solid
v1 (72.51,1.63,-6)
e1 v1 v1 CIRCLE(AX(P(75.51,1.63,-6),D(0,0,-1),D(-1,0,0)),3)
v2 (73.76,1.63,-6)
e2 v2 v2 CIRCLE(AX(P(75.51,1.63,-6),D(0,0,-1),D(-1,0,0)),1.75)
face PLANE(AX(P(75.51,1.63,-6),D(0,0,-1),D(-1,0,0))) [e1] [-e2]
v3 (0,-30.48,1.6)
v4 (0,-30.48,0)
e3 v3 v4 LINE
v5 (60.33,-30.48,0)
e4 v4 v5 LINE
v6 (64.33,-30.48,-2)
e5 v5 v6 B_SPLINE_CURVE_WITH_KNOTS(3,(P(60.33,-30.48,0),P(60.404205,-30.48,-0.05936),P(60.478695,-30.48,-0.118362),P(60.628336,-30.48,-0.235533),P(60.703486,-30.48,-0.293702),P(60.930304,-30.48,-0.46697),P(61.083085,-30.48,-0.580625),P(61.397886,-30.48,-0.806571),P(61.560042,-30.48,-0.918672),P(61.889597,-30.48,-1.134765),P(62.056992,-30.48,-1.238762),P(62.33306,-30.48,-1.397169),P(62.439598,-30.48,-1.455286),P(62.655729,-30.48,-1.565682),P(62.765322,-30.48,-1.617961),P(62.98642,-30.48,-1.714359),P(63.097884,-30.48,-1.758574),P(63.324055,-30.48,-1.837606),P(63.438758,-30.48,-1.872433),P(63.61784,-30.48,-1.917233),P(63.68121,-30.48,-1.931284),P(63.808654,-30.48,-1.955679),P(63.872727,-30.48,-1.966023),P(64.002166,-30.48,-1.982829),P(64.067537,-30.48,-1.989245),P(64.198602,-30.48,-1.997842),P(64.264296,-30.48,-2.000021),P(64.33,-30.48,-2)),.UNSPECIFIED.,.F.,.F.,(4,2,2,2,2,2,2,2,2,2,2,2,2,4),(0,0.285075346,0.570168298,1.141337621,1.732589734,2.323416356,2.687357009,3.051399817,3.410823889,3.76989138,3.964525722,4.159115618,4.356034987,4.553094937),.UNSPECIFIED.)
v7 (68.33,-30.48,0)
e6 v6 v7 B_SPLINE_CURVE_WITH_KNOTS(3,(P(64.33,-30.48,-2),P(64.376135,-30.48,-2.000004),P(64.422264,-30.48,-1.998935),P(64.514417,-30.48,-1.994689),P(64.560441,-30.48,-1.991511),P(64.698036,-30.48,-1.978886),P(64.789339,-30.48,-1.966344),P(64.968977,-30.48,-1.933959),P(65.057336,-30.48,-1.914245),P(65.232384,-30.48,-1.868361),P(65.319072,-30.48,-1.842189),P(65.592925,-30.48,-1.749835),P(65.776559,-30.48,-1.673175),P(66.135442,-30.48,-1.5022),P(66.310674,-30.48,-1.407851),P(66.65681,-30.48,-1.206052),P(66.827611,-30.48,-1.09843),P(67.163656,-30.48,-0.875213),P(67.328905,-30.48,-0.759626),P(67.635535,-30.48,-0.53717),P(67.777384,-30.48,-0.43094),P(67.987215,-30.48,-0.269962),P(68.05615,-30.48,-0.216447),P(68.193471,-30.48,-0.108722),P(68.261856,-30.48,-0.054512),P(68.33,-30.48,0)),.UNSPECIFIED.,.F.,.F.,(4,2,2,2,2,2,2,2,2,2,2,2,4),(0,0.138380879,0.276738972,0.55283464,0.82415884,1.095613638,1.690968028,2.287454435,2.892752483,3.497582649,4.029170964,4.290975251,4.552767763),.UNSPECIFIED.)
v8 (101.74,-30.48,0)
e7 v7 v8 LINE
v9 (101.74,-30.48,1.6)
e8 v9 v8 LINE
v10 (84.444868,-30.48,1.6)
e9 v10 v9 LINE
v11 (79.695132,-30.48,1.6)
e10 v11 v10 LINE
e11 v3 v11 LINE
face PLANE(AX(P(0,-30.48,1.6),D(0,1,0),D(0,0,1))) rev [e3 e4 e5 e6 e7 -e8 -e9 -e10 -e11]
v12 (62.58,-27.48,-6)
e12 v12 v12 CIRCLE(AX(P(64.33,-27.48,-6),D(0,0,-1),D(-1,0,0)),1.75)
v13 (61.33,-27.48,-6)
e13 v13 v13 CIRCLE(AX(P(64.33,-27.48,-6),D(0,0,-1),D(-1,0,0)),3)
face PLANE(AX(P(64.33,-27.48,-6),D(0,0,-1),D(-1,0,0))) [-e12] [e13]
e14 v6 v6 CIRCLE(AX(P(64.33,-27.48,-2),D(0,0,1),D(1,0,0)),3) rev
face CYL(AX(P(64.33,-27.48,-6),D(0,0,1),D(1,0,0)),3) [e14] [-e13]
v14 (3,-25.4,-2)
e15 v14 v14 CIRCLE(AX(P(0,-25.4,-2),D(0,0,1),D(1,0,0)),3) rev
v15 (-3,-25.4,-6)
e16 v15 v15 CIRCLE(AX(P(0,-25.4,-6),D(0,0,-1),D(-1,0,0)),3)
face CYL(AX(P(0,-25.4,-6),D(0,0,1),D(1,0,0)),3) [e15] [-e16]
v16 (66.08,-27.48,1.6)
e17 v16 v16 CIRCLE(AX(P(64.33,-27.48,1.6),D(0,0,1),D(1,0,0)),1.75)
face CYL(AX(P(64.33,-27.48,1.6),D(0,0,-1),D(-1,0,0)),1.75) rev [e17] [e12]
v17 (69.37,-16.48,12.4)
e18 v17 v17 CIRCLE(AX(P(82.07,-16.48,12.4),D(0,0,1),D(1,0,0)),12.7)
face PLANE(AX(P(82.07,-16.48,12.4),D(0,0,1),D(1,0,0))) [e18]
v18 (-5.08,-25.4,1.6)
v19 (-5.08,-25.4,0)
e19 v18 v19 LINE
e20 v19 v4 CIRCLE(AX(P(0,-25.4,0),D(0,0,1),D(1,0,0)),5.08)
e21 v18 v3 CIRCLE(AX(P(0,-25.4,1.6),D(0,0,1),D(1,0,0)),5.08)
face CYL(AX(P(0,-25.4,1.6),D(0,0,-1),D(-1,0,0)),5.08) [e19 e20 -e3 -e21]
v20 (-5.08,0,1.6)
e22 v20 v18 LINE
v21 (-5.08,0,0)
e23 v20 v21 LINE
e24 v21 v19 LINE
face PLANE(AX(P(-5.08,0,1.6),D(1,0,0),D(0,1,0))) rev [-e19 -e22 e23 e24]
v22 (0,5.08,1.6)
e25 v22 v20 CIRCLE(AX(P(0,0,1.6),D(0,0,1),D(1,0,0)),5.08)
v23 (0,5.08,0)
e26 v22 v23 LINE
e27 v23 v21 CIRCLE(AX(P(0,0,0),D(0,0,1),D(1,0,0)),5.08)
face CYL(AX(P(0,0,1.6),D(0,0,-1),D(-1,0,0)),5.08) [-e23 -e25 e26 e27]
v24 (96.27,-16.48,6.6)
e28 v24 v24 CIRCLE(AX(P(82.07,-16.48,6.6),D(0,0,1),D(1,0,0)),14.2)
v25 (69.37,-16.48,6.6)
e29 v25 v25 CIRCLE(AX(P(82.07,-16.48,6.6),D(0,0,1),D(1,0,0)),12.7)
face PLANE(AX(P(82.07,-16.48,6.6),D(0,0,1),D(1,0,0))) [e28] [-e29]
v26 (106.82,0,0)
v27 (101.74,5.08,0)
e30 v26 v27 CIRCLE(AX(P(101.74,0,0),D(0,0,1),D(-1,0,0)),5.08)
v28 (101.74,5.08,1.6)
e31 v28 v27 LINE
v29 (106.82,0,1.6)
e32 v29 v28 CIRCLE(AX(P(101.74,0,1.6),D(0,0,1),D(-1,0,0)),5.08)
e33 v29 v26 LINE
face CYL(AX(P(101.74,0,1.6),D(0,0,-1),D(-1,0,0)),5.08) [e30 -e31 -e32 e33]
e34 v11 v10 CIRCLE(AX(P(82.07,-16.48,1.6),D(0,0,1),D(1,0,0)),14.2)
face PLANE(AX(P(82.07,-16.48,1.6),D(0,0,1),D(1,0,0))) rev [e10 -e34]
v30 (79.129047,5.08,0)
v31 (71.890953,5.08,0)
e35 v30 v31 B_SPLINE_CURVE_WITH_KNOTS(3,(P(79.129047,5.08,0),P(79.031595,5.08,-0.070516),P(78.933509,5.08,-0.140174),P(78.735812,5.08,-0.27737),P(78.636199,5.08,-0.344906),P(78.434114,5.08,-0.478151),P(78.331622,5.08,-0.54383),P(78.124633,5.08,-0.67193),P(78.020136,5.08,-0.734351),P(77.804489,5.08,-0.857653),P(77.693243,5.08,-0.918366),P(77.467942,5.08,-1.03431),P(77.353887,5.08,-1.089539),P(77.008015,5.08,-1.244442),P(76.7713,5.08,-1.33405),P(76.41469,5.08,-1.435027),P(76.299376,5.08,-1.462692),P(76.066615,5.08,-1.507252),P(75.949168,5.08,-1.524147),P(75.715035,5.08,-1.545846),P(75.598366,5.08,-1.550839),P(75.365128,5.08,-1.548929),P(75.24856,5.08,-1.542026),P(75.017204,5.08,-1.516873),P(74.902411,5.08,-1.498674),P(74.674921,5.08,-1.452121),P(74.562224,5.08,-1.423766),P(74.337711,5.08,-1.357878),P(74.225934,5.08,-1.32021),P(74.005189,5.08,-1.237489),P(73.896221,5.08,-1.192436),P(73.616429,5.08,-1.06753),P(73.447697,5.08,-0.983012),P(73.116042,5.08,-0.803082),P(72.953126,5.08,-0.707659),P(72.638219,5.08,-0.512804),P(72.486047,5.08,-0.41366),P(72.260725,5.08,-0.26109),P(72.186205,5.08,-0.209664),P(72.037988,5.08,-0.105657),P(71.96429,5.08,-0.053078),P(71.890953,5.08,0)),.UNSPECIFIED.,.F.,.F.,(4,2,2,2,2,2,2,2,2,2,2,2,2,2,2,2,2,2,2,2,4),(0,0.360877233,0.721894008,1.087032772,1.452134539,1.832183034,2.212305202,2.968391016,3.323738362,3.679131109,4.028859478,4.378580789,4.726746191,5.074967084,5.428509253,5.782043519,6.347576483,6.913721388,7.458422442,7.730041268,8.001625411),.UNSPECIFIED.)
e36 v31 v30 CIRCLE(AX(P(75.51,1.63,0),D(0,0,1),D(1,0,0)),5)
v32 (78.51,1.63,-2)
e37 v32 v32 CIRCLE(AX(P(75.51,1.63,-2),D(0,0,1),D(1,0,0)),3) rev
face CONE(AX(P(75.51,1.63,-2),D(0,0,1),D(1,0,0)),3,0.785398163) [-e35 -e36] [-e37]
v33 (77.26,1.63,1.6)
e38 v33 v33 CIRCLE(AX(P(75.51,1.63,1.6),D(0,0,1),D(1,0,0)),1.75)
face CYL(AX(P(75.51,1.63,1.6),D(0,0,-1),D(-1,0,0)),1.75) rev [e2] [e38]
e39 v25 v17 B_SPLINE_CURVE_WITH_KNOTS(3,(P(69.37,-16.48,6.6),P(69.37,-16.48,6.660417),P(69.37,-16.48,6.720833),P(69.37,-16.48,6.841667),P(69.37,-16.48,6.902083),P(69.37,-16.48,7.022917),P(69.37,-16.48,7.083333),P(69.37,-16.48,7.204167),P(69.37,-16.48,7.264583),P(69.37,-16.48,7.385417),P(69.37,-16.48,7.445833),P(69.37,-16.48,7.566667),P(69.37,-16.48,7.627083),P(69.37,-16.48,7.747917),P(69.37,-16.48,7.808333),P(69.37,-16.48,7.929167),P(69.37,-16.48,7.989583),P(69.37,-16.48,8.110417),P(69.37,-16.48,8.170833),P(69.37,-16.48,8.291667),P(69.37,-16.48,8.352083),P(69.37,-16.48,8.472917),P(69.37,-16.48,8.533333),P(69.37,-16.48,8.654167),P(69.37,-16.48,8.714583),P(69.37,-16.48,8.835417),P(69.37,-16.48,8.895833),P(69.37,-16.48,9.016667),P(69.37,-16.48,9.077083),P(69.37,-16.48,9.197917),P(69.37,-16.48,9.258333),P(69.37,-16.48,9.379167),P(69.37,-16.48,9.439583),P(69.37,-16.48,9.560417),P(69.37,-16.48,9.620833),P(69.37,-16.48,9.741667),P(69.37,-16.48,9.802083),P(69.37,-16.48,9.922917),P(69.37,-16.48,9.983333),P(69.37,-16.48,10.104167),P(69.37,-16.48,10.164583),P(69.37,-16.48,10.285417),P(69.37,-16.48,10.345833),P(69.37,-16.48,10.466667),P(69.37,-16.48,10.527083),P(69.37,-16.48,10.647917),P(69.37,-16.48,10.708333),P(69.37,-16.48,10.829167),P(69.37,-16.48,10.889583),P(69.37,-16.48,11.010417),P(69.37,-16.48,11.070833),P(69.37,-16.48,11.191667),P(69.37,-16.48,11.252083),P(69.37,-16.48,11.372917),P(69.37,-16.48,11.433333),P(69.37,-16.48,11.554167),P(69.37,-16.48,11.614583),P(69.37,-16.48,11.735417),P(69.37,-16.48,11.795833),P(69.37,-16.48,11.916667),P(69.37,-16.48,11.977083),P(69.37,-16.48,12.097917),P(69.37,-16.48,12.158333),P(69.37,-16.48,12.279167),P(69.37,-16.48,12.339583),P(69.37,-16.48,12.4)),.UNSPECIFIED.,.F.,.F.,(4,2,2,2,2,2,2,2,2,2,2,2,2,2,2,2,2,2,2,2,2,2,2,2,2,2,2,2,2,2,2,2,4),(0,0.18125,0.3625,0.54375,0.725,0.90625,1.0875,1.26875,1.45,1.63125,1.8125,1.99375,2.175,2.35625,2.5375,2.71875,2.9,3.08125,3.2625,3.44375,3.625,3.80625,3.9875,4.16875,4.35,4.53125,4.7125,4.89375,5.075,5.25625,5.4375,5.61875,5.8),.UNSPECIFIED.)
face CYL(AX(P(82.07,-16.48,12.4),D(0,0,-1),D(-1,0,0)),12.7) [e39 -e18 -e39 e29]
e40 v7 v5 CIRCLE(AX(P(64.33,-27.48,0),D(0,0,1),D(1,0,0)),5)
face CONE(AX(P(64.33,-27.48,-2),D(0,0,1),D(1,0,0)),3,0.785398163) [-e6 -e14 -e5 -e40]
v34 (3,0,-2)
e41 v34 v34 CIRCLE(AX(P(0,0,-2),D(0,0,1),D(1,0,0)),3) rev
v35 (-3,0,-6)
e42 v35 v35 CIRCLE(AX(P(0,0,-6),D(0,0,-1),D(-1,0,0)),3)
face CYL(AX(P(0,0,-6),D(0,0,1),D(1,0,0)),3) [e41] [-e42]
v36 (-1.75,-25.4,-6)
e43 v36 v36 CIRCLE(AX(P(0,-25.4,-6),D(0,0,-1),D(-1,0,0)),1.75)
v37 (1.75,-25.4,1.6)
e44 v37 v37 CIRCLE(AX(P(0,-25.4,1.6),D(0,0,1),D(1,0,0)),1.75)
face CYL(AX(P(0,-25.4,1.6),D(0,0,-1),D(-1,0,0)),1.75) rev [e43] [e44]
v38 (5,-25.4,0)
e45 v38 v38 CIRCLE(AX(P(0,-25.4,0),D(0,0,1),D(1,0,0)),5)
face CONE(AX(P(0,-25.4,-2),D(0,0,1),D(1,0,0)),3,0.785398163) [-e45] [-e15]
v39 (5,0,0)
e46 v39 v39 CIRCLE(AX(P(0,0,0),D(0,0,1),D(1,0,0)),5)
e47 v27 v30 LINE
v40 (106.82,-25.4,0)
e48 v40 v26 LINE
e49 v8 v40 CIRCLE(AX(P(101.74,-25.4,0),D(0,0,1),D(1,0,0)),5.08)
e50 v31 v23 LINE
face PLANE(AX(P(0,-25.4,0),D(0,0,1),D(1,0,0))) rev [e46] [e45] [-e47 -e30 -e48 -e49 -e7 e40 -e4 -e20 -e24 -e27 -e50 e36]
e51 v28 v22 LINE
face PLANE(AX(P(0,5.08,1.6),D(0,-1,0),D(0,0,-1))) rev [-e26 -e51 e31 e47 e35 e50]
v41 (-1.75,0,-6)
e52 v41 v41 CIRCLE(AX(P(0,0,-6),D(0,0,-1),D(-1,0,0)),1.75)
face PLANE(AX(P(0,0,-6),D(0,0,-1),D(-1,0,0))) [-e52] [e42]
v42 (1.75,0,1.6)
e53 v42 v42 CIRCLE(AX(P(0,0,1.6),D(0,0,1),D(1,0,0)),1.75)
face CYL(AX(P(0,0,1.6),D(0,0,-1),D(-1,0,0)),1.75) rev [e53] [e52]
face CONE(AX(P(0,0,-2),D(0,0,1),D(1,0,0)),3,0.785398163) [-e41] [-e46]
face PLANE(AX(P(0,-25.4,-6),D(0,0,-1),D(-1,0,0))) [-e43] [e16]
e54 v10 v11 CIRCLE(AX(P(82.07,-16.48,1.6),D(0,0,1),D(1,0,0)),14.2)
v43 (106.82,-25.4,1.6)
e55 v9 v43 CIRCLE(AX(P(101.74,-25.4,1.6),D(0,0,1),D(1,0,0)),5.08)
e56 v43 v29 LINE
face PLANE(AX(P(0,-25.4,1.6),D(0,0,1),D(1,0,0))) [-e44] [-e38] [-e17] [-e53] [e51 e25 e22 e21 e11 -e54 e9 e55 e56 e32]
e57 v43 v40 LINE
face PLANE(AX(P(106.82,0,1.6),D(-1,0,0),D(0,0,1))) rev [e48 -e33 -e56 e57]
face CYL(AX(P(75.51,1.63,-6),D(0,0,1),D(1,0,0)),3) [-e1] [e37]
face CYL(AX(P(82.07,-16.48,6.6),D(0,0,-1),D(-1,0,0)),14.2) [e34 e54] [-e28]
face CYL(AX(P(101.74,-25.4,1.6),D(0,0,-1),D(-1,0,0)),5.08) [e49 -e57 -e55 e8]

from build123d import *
from build123d.topology import SkipClean

# Parameters (mm, degrees)
SKETCH1_R           = 1.75
BOSS_EXTRUDE1_DEPTH = 1.6
SKETCH2_R           = 12.7
BOSS_EXTRUDE2_DEPTH = 10.8
BOSS_EXTRUDE3_START = 6
SKETCH3_R           = 3
SKETCH3_R_2         = 1.75
BOSS_EXTRUDE3_DEPTH = 6
SKETCH4_R           = 14.2
SKETCH4_R_2         = 12.7
BOSS_EXTRUDE4_DEPTH = 5
CHAMFER1_SIZE       = 2


with BuildPart() as part:
    # Sketch1 → Boss-Extrude1 (new body)
    with BuildSketch(Plane.XY):
        with BuildLine():
            Line((0, 5.08), (101.74, 5.08))
            ThreePointArc((101.74, 5.08), (105.332102448, 3.592102448), (106.82, 0))
            Line((106.82, 0), (106.82, -25.4))
            ThreePointArc((106.82, -25.4), (105.332102448, -28.992102448), (101.74, -30.48))
            Line((101.74, -30.48), (0, -30.48))
            ThreePointArc((0, -30.48), (-3.592102448, -28.992102448), (-5.08, -25.4))
            Line((-5.08, -25.4), (-5.08, 0))
            ThreePointArc((-5.08, 0), (-3.592102448, 3.592102448), (0, 5.08))
        make_face()
        Circle(SKETCH1_R, mode=Mode.SUBTRACT)
        with Locations((0, -25.4)):
            Circle(SKETCH1_R, mode=Mode.SUBTRACT)
        with Locations((75.51, 1.63)):
            Circle(SKETCH1_R, mode=Mode.SUBTRACT)
        with Locations((64.33, -27.48)):
            Circle(SKETCH1_R, mode=Mode.SUBTRACT)
    extrude(amount=BOSS_EXTRUDE1_DEPTH)

    # Sketch2 → Boss-Extrude2 (add)
    with BuildSketch(Plane.XY.offset(1.6)):
        with Locations(Location((82.07, -16.48, 0), (0, 0, 180))):
            Circle(SKETCH2_R)
    extrude(amount=BOSS_EXTRUDE2_DEPTH)

    # Sketch3 → Boss-Extrude3 (add)
    # profile 1 of 4: a face of its own
    with SkipClean():  # the faces are left unmerged after this step: merging them gives an invalid solid
        with BuildSketch(Plane(origin=(0, 0, 0), x_dir=(-1, 0, 0), z_dir=(0, 0, -1)).offset(BOSS_EXTRUDE3_START)):
            with Locations(Location((-75.51, 1.63, 0), (0, 0, 180))):
                Circle(SKETCH3_R)
            with Locations((-75.51, 1.63)):
                Circle(SKETCH3_R_2, mode=Mode.SUBTRACT)
        # profile 2 of 4: a face of its own
        with BuildSketch(Plane(origin=(0, 0, 0), x_dir=(-1, 0, 0), z_dir=(0, 0, -1)).offset(BOSS_EXTRUDE3_START)):
            with Locations(Location((-64.33, -27.48, 0), (0, 0, 270))):
                Circle(SKETCH3_R)
            with Locations((-64.33, -27.48)):
                Circle(SKETCH3_R_2, mode=Mode.SUBTRACT)
        # profile 3 of 4: a face of its own
        with BuildSketch(Plane(origin=(0, 0, 0), x_dir=(-1, 0, 0), z_dir=(0, 0, -1)).offset(BOSS_EXTRUDE3_START)):
            with Locations(Location((0, -25.4, 0), (0, 0, 180))):
                Circle(SKETCH3_R)
            with Locations((0, -25.4)):
                Circle(SKETCH3_R_2, mode=Mode.SUBTRACT)
        # profile 4 of 4: a face of its own
        with BuildSketch(Plane(origin=(0, 0, 0), x_dir=(-1, 0, 0), z_dir=(0, 0, -1)).offset(BOSS_EXTRUDE3_START)):
            with Locations(Location((0, 0, 0), (0, 0, 180))):
                Circle(SKETCH3_R)
            Circle(SKETCH3_R_2, mode=Mode.SUBTRACT)
        extrude(amount=-BOSS_EXTRUDE3_DEPTH)

    # Sketch4 → Boss-Extrude4 (add)
    with SkipClean():  # the faces are left unmerged after this step: merging them gives an invalid solid
        with BuildSketch(Plane.XY.offset(1.6)):
            with Locations(Location((82.07, -16.48, 0), (0, 0, 260.372367317))):
                Circle(SKETCH4_R)
            with Locations(Location((82.07, -16.48, 0), (0, 0, 180))):
                Circle(SKETCH4_R_2, mode=Mode.SUBTRACT)
        extrude(amount=BOSS_EXTRUDE4_DEPTH)

    # Chamfer1
    # the kernel refuses this chamfer: 2 mm, written as the material it adds along each edge
    with BuildSketch(Plane(origin=(75.51, 1.63, 0), x_dir=(1, 0, 0), z_dir=(0, 1, 0))) as chamfer1_piece_1_section:
        Polygon((3 + CHAMFER1_SIZE, 0), (3, CHAMFER1_SIZE), (3, 0), align=None)
    chamfer1_piece_1 = revolve(axis=Axis((75.51, 1.63, 0), (0, 0, -1)), mode=Mode.PRIVATE)
    chamfer1_piece_1 = split(chamfer1_piece_1, bisect_by=Plane(origin=(71.534469878, 5.08, -0.975530122), z_dir=(0, -1, 0)), keep=Keep.TOP, mode=Mode.PRIVATE)
    add(chamfer1_piece_1)
    with BuildSketch(Plane(origin=(64.33, -27.48, 0), x_dir=(0, -1, 0), z_dir=(1, 0, 0))) as chamfer1_piece_2_section:
        Polygon((3 + CHAMFER1_SIZE, 0), (3, CHAMFER1_SIZE), (3, 0), align=None)
    chamfer1_piece_2 = revolve(axis=Axis((64.33, -27.48, 0), (0, 0, -1)), mode=Mode.PRIVATE)
    chamfer1_piece_2 = split(chamfer1_piece_2, bisect_by=Plane(origin=(64.33, -30.48, -0.976321061), z_dir=(0, 1, 0)), keep=Keep.TOP, mode=Mode.PRIVATE)
    add(chamfer1_piece_2)
    with BuildSketch(Plane(origin=(0, -25.4, 0), x_dir=(1, 0, 0), z_dir=(0, 1, 0))) as chamfer1_piece_3:
        Polygon((3 + CHAMFER1_SIZE, 0), (3, CHAMFER1_SIZE), (3, 0), align=None)
    revolve(axis=Axis((0, -25.4, 0), (0, 0, -1)))
    with BuildSketch(Plane(origin=(0, 0, 0), x_dir=(1, 0, 0), z_dir=(0, 1, 0))) as chamfer1_piece_4:
        Polygon((3 + CHAMFER1_SIZE, 0), (3, CHAMFER1_SIZE), (3, 0), align=None)
    revolve(axis=Axis((0, 0, 0), (0, 0, -1)))


solid = part.part
